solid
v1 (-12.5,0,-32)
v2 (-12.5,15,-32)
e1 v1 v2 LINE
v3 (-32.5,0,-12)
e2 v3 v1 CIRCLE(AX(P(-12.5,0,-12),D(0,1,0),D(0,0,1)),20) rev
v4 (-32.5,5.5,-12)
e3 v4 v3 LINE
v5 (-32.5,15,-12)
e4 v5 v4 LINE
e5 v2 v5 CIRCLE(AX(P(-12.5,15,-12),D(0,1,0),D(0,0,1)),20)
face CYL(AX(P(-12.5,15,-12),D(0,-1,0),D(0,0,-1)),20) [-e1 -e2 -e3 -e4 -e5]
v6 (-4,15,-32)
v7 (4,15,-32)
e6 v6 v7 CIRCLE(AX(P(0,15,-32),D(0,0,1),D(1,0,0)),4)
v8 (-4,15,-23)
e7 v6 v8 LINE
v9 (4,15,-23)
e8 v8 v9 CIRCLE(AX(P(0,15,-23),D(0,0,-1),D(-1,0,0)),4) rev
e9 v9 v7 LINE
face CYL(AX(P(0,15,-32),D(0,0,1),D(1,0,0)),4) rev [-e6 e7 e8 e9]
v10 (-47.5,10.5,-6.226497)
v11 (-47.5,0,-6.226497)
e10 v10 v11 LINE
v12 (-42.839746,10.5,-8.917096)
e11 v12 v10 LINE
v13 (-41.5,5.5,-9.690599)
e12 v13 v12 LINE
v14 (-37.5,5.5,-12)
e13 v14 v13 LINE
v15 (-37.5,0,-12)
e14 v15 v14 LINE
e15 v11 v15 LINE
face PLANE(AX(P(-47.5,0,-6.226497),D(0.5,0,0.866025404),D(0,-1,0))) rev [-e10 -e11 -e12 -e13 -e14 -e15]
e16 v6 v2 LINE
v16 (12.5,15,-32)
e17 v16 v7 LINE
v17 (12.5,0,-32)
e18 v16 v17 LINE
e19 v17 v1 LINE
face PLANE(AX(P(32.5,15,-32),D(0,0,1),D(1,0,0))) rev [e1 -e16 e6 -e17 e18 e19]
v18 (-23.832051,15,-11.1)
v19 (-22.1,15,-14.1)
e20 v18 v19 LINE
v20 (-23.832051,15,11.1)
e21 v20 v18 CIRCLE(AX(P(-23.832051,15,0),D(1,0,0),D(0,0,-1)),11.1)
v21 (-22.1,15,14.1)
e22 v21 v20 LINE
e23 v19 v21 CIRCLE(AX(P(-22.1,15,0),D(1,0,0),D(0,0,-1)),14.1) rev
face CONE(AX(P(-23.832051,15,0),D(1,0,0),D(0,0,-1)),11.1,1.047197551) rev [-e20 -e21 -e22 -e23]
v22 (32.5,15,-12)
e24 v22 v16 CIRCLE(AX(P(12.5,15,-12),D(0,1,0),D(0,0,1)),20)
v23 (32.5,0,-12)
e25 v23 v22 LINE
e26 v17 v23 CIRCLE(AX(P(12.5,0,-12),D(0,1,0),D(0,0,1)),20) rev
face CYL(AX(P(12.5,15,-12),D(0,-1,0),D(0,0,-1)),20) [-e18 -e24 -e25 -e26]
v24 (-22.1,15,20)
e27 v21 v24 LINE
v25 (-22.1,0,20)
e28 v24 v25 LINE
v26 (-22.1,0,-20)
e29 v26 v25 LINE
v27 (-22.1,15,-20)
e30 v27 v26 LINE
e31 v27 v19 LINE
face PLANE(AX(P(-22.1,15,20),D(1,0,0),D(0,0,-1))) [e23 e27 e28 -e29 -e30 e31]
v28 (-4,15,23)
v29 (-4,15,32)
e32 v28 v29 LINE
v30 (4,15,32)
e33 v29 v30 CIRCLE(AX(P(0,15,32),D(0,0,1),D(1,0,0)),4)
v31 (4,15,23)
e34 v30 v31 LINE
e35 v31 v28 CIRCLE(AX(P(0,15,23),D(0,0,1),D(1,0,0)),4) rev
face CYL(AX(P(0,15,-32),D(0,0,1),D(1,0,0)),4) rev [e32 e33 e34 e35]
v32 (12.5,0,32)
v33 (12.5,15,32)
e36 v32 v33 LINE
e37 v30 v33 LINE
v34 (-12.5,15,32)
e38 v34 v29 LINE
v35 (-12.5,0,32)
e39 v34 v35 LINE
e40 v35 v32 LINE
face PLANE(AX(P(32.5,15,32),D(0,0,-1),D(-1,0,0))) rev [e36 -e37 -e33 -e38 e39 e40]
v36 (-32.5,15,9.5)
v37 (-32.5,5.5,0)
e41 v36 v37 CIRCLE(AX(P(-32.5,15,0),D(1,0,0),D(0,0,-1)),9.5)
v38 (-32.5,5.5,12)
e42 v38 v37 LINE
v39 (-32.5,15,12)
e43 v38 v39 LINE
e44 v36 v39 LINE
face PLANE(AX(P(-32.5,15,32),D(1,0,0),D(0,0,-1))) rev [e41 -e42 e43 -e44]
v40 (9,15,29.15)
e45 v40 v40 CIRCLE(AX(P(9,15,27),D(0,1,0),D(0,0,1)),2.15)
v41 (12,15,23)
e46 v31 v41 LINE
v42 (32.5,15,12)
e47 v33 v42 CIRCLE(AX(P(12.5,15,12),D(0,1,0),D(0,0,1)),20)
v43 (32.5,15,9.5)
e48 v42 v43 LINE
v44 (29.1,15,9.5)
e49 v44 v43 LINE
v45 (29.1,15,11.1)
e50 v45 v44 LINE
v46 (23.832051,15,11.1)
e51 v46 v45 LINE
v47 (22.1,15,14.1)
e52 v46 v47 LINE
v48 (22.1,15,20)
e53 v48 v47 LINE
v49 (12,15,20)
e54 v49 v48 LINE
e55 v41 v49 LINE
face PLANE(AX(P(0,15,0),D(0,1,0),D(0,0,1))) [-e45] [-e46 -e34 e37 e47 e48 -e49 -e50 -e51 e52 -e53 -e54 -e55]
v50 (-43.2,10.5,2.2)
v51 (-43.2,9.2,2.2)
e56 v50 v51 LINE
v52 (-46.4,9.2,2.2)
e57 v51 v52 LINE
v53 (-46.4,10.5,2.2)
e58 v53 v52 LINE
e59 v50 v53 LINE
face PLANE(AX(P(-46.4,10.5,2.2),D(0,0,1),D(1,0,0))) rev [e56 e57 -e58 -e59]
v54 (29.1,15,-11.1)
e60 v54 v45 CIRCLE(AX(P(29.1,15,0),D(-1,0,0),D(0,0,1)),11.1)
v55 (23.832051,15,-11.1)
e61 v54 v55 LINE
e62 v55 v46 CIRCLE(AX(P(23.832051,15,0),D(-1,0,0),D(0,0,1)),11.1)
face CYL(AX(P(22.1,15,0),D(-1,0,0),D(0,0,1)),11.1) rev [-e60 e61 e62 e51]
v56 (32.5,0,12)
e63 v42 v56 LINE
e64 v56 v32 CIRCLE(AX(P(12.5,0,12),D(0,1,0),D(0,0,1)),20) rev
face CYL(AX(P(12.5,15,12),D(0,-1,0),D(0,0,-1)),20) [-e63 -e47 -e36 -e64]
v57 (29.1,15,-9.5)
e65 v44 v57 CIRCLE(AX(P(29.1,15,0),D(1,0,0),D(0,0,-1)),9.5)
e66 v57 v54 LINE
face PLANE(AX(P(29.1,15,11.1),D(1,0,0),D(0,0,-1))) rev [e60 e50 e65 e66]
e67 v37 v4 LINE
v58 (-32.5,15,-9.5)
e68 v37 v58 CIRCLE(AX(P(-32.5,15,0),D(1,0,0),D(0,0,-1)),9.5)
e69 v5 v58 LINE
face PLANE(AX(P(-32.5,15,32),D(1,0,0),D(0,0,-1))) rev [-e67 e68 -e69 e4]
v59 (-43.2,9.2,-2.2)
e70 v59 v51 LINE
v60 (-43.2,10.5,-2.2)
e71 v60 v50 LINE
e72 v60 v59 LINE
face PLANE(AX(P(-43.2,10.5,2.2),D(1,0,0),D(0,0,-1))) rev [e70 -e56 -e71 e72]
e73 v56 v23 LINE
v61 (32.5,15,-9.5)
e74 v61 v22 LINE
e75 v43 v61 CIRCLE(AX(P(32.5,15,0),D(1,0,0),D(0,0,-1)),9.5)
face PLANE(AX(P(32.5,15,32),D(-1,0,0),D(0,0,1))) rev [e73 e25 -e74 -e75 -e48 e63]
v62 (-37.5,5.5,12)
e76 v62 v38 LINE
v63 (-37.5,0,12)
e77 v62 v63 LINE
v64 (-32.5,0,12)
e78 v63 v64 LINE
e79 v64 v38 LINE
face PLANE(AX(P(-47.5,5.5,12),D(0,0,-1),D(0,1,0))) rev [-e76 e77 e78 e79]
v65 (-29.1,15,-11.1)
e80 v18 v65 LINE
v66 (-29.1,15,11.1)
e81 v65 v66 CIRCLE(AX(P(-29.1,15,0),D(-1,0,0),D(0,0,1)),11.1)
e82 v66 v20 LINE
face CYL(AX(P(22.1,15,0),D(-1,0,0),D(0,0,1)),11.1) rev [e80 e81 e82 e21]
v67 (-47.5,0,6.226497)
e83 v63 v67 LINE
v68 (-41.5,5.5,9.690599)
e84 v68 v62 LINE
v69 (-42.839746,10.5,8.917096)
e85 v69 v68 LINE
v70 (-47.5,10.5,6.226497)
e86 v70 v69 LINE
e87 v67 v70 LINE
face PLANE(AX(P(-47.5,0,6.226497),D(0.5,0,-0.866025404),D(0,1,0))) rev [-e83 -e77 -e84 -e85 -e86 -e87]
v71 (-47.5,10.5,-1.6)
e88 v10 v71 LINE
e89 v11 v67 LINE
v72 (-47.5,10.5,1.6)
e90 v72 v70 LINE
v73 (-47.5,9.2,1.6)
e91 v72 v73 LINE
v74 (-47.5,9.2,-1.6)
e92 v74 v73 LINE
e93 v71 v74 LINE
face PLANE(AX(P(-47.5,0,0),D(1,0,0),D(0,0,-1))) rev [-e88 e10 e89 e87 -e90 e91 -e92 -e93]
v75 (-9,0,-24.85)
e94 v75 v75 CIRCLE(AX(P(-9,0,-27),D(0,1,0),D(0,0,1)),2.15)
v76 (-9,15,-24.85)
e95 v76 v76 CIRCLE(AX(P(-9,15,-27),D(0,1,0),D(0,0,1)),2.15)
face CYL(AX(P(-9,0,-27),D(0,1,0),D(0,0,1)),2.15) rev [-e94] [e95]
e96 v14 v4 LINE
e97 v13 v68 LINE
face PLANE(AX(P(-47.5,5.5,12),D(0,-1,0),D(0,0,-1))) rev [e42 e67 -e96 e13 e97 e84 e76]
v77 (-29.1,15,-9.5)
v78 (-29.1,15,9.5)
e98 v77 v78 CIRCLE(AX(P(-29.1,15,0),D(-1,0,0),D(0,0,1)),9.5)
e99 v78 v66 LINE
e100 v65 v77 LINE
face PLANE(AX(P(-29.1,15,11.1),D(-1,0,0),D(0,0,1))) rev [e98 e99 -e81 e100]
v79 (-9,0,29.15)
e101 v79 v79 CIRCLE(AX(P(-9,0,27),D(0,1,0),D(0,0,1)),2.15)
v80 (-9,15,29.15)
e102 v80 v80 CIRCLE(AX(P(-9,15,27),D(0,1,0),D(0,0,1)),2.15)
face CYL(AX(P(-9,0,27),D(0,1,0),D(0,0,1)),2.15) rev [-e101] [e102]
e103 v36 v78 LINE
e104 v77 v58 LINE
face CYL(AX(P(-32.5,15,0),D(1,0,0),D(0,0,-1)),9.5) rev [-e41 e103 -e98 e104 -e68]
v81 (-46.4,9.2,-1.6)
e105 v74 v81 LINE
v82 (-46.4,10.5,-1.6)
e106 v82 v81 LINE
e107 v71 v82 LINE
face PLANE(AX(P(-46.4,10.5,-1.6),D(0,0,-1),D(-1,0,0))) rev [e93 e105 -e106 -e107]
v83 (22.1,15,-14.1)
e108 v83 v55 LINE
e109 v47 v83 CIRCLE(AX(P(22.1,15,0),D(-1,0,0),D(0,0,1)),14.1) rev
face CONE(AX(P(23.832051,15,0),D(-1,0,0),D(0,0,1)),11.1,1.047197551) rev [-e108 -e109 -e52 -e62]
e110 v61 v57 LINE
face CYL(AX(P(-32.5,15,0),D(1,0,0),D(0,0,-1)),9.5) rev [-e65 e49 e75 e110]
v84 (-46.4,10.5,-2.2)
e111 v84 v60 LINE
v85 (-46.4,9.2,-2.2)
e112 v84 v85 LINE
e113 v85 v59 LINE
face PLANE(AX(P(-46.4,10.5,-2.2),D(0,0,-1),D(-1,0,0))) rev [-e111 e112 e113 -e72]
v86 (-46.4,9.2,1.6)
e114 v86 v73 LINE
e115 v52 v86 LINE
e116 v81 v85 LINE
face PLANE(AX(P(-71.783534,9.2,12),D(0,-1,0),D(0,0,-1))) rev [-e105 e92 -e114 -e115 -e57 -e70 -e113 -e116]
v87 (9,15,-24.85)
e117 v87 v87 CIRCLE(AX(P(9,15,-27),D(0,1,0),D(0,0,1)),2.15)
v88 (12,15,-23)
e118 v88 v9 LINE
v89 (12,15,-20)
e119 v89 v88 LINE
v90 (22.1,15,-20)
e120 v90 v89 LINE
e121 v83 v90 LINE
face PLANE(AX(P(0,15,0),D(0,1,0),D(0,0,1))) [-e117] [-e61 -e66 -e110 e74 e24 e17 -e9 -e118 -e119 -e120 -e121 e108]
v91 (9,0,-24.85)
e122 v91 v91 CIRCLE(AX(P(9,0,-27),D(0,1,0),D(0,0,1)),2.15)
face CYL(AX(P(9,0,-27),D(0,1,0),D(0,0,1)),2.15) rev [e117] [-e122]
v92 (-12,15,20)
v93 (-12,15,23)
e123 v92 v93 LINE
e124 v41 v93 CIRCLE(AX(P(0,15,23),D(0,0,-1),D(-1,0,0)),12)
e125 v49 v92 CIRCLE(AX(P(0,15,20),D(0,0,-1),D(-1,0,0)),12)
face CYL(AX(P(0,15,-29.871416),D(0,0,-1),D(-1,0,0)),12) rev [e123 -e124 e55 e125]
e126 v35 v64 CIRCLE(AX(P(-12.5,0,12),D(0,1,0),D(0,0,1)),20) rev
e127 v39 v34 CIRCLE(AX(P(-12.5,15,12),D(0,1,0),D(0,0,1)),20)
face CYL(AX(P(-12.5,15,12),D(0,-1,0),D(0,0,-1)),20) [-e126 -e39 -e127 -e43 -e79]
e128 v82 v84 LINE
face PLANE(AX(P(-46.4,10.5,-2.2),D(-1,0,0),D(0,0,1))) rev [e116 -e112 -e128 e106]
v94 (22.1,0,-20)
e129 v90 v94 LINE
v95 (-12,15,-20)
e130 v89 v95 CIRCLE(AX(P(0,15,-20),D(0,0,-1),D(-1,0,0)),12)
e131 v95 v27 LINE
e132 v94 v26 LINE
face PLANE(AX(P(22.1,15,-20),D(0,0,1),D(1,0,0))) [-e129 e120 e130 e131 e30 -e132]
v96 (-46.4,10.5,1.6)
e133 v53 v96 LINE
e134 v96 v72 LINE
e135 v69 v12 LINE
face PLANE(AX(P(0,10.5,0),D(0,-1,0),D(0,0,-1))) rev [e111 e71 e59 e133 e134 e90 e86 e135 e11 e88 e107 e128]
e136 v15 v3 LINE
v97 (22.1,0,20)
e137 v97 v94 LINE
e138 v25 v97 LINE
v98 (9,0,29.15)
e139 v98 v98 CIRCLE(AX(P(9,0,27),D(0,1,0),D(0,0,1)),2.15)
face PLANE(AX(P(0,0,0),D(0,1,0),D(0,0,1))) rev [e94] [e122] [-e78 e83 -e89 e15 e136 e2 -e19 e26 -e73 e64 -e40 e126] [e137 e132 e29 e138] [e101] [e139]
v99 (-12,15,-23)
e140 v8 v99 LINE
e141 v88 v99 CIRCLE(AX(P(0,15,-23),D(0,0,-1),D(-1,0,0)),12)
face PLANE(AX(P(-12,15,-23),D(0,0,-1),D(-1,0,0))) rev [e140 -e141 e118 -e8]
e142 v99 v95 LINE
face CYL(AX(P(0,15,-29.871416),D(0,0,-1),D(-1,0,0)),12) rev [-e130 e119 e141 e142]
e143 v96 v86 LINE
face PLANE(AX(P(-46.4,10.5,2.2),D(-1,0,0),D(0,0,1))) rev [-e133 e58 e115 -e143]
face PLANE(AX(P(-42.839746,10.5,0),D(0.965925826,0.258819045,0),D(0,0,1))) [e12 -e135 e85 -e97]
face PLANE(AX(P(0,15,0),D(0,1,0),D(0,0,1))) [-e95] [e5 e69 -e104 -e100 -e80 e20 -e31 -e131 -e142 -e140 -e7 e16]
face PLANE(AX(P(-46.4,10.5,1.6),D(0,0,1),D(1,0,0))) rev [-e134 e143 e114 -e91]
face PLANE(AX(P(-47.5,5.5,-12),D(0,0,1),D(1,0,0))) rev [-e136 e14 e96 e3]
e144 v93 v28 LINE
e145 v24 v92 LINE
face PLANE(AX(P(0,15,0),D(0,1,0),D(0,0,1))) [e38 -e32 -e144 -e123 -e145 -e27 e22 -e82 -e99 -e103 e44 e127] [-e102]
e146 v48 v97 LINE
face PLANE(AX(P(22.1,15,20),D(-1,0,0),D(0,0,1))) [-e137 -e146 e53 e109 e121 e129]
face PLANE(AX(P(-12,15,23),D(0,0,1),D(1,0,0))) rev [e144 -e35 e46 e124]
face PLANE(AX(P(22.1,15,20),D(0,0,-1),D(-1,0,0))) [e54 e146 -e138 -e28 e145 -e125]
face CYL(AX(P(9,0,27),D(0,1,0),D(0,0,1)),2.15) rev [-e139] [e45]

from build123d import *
from OCP.BRepFilletAPI import BRepFilletAPI_MakeChamfer

# Parameters (mm, degrees)
SKETCH1_W           = 65
SKETCH1_H           = 64
SKETCH1_W_2         = 44.2
SKETCH1_H_2         = 40
BOSS_EXTRUDE1_DEPTH = 15
SKETCH3_W           = 7
SKETCH3_H           = 11.1
SKETCH4_R           = 9.5
CUT_EXTRUDE2_DEPTH  = 74.986485252
SKETCH5_R           = 4
CUT_EXTRUDE3_DEPTH  = 74.32973476
SKETCH8_R           = 2.15
CUT_EXTRUDE6_DEPTH  = 49.013019068
FILLET1_R           = 20
CHAMFER1_SIZE       = 3
CHAMFER1_SIZE2      = 1.732050808
SKETCH9_W           = 12
SKETCH9_H           = 3
SKETCH10_W          = 24
SKETCH10_H          = 5.5
BOSS_EXTRUDE2_DEPTH = 15
BOSS_EXTRUDE3_START = 9
SKETCH12_W          = 24
SKETCH12_H          = 3.7
BOSS_EXTRUDE3_DEPTH = 6
BOSS_EXTRUDE4_DEPTH = 1.3
CHAMFER2_SIZE2      = 1.339745962
CHAMFER2_SIZE       = 5
CHAMFER3_SIZE       = 10
CHAMFER3_SIZE2      = 5.773502692


with BuildPart() as part:
    # Sketch1 → Boss-Extrude1 (new body)
    with BuildSketch(Plane(origin=(0, 0, 0), x_dir=(1, 0, 0), z_dir=(0, 1, 0))):
        Rectangle(SKETCH1_W, SKETCH1_H)
        Rectangle(SKETCH1_W_2, SKETCH1_H_2, mode=Mode.SUBTRACT)
    extrude(amount=BOSS_EXTRUDE1_DEPTH)

    # Sketch3 → Cut-Revolve1 (revolve, cut)
    with BuildSketch(Plane(origin=(0, 15, 0), x_dir=(1, 0, 0), z_dir=(0, 1, 0))):
        with Locations((25.6, -5.55)):
            Rectangle(SKETCH3_W, SKETCH3_H)
        with Locations((-25.6, -5.55)):
            Rectangle(SKETCH3_W, SKETCH3_H)
    revolve(axis=Axis((22.1, 15, 0), (1, 0, 0)), mode=Mode.SUBTRACT)

    # Sketch4 → Cut-Extrude2 (cut, through all)
    with BuildSketch(Plane(origin=(32.5, 0, 0), x_dir=(0, 0, -1), z_dir=(1, 0, 0))):
        with Locations((0, 15)):
            Circle(SKETCH4_R)
    extrude(amount=-CUT_EXTRUDE2_DEPTH, mode=Mode.SUBTRACT)

    # Sketch5 → Cut-Extrude3 (cut, through all)
    with BuildSketch(Plane.XY.offset(32)):
        with Locations((0, 15)):
            Circle(SKETCH5_R)
    extrude(amount=-CUT_EXTRUDE3_DEPTH, mode=Mode.SUBTRACT)

    # Sketch8 → Cut-Extrude6 (cut, through all)
    with BuildSketch(Plane(origin=(0, 15, 0), x_dir=(1, 0, 0), z_dir=(0, 1, 0))):
        with Locations((18, 16.5)):
            Circle(SKETCH8_R)
        with Locations((18, -16.5)):
            Circle(SKETCH8_R)
        with Locations((-18, -16.5)):
            Circle(SKETCH8_R)
        with Locations((-18, 16.5)):
            Circle(SKETCH8_R)
        with Locations(Location((9, -27, 0), (0, 0, 270))):
            Circle(SKETCH8_R)
        with Locations(Location((-9, -27, 0), (0, 0, 270))):
            Circle(SKETCH8_R)
        with Locations(Location((-9, 27, 0), (0, 0, 270))):
            Circle(SKETCH8_R)
        with Locations(Location((9, 27, 0), (0, 0, 270))):
            Circle(SKETCH8_R)
    extrude(amount=-CUT_EXTRUDE6_DEPTH, mode=Mode.SUBTRACT)

    # Fillet1
    fillet1_edges = [part.edges().sort_by_distance(p)[0] for p in [
        (-32.5, 7.5, -32),
        (32.5, 7.5, -32),
        (32.5, 7.5, 32),
        (-32.5, 7.5, 32),
    ]]
    fillet(fillet1_edges, radius=FILLET1_R)

    # Chamfer1: one chamfer whose edges measure the first distance from different faces: ONE call of the kernel's chamfer builder (chamfer() names one face for all edges)
    chamfer1_edges_1 = [part.edges().sort_by_distance(p)[0] for p in [
        (22.1, 3.9, 0),
    ]]
    chamfer1_side_1 = [part.faces().sort_by_distance(p)[0] for p in [
        (22.1, 0.427200187, 0),
    ]]
    chamfer1_edges_2 = [part.edges().sort_by_distance(p)[0] for p in [
        (-22.1, 3.9, 0),
    ]]
    chamfer1_side_2 = [part.faces().sort_by_distance(p)[0] for p in [
        (-22.1, 0.427200187, 0),
    ]]
    chamfer1 = BRepFilletAPI_MakeChamfer(part.part.solid().wrapped)
    for e in chamfer1_edges_1:
        chamfer1.Add(CHAMFER1_SIZE, CHAMFER1_SIZE2, e.wrapped, chamfer1_side_1[0].wrapped)  # the first distance lies on this face
    for e in chamfer1_edges_2:
        chamfer1.Add(CHAMFER1_SIZE, CHAMFER1_SIZE2, e.wrapped, chamfer1_side_2[0].wrapped)  # the first distance lies on this face
    add(Compound.cast(chamfer1.Shape()), mode=Mode.REPLACE)

    # Sketch9 → Cut-Revolve2 (revolve, cut)
    with BuildSketch(Plane(origin=(0, 15, 0), x_dir=(1, 0, 0), z_dir=(0, 1, 0))):
        with Locations((-6, -21.5)):
            Rectangle(SKETCH9_W, SKETCH9_H)
        with Locations((-6, 21.5)):
            Rectangle(SKETCH9_W, SKETCH9_H)
    revolve(axis=Axis((0, 15, -29.871415895), (0, 0, 1)), mode=Mode.SUBTRACT)

    # Sketch10 → Boss-Extrude2 (add)
    with BuildSketch(Plane.ZY.offset(32.5)):
        with Locations((0, 2.75)):
            Rectangle(SKETCH10_W, SKETCH10_H)
    extrude(amount=BOSS_EXTRUDE2_DEPTH)

    # Sketch12 → Boss-Extrude3 (add)
    with BuildSketch(Plane.ZY.offset(32.5).offset(BOSS_EXTRUDE3_START)):
        with Locations((0, 7.35)):
            Rectangle(SKETCH12_W, SKETCH12_H)
    extrude(amount=BOSS_EXTRUDE3_DEPTH)

    # Sketch13 → Boss-Extrude4 (add)
    with BuildSketch(Plane(origin=(0, 9.2, 0), x_dir=(1, 0, 0), z_dir=(0, 1, 0))):
        Polygon((-46.4, 2.2), (-46.4, 1.6), (-47.5, 1.6), (-47.5, 12), (-41.5, 12), (-41.5, -12), (-47.5, -12), (-47.5, -1.6), (-46.4, -1.6), (-46.4, -2.2), (-43.2, -2.2), (-43.2, 2.2), align=None)
    extrude(amount=BOSS_EXTRUDE4_DEPTH)

    # Chamfer2
    chamfer2_edges = [part.edges().sort_by_distance(p)[0] for p in [
        (-41.5, 10.5, 0),
    ]]
    chamfer2_side = [part.faces().sort_by_distance(p)[0] for p in [
        (-41.5, 10.473205081, 0),
    ]]
    chamfer(chamfer2_edges, length=CHAMFER2_SIZE - 0.0001, length2=CHAMFER2_SIZE2 - 0.0001, reference=chamfer2_side[0])  # a hair under: the kernel refuses the full size

    # Chamfer3: one chamfer whose edges measure the first distance from different faces: ONE call of the kernel's chamfer builder (chamfer() names one face for all edges)
    chamfer3_edges_1 = [part.edges().sort_by_distance(p)[0] for p in [
        (-47.5, 5.25, 12),
    ]]
    chamfer3_side_1 = [part.faces().sort_by_distance(p)[0] for p in [
        (-41.177093858, 4.00630158, 12),
    ]]
    chamfer3_edges_2 = [part.edges().sort_by_distance(p)[0] for p in [
        (-47.5, 5.25, -12),
    ]]
    chamfer3_side_2 = [part.faces().sort_by_distance(p)[0] for p in [
        (-41.177093858, 4.00630158, -12),
    ]]
    chamfer3 = BRepFilletAPI_MakeChamfer(part.part.solid().wrapped)
    for e in chamfer3_edges_1:
        chamfer3.Add(CHAMFER3_SIZE, CHAMFER3_SIZE2, e.wrapped, chamfer3_side_1[0].wrapped)  # the first distance lies on this face
    for e in chamfer3_edges_2:
        chamfer3.Add(CHAMFER3_SIZE, CHAMFER3_SIZE2, e.wrapped, chamfer3_side_2[0].wrapped)  # the first distance lies on this face
    add(Compound.cast(chamfer3.Shape()), mode=Mode.REPLACE)


solid = part.part
